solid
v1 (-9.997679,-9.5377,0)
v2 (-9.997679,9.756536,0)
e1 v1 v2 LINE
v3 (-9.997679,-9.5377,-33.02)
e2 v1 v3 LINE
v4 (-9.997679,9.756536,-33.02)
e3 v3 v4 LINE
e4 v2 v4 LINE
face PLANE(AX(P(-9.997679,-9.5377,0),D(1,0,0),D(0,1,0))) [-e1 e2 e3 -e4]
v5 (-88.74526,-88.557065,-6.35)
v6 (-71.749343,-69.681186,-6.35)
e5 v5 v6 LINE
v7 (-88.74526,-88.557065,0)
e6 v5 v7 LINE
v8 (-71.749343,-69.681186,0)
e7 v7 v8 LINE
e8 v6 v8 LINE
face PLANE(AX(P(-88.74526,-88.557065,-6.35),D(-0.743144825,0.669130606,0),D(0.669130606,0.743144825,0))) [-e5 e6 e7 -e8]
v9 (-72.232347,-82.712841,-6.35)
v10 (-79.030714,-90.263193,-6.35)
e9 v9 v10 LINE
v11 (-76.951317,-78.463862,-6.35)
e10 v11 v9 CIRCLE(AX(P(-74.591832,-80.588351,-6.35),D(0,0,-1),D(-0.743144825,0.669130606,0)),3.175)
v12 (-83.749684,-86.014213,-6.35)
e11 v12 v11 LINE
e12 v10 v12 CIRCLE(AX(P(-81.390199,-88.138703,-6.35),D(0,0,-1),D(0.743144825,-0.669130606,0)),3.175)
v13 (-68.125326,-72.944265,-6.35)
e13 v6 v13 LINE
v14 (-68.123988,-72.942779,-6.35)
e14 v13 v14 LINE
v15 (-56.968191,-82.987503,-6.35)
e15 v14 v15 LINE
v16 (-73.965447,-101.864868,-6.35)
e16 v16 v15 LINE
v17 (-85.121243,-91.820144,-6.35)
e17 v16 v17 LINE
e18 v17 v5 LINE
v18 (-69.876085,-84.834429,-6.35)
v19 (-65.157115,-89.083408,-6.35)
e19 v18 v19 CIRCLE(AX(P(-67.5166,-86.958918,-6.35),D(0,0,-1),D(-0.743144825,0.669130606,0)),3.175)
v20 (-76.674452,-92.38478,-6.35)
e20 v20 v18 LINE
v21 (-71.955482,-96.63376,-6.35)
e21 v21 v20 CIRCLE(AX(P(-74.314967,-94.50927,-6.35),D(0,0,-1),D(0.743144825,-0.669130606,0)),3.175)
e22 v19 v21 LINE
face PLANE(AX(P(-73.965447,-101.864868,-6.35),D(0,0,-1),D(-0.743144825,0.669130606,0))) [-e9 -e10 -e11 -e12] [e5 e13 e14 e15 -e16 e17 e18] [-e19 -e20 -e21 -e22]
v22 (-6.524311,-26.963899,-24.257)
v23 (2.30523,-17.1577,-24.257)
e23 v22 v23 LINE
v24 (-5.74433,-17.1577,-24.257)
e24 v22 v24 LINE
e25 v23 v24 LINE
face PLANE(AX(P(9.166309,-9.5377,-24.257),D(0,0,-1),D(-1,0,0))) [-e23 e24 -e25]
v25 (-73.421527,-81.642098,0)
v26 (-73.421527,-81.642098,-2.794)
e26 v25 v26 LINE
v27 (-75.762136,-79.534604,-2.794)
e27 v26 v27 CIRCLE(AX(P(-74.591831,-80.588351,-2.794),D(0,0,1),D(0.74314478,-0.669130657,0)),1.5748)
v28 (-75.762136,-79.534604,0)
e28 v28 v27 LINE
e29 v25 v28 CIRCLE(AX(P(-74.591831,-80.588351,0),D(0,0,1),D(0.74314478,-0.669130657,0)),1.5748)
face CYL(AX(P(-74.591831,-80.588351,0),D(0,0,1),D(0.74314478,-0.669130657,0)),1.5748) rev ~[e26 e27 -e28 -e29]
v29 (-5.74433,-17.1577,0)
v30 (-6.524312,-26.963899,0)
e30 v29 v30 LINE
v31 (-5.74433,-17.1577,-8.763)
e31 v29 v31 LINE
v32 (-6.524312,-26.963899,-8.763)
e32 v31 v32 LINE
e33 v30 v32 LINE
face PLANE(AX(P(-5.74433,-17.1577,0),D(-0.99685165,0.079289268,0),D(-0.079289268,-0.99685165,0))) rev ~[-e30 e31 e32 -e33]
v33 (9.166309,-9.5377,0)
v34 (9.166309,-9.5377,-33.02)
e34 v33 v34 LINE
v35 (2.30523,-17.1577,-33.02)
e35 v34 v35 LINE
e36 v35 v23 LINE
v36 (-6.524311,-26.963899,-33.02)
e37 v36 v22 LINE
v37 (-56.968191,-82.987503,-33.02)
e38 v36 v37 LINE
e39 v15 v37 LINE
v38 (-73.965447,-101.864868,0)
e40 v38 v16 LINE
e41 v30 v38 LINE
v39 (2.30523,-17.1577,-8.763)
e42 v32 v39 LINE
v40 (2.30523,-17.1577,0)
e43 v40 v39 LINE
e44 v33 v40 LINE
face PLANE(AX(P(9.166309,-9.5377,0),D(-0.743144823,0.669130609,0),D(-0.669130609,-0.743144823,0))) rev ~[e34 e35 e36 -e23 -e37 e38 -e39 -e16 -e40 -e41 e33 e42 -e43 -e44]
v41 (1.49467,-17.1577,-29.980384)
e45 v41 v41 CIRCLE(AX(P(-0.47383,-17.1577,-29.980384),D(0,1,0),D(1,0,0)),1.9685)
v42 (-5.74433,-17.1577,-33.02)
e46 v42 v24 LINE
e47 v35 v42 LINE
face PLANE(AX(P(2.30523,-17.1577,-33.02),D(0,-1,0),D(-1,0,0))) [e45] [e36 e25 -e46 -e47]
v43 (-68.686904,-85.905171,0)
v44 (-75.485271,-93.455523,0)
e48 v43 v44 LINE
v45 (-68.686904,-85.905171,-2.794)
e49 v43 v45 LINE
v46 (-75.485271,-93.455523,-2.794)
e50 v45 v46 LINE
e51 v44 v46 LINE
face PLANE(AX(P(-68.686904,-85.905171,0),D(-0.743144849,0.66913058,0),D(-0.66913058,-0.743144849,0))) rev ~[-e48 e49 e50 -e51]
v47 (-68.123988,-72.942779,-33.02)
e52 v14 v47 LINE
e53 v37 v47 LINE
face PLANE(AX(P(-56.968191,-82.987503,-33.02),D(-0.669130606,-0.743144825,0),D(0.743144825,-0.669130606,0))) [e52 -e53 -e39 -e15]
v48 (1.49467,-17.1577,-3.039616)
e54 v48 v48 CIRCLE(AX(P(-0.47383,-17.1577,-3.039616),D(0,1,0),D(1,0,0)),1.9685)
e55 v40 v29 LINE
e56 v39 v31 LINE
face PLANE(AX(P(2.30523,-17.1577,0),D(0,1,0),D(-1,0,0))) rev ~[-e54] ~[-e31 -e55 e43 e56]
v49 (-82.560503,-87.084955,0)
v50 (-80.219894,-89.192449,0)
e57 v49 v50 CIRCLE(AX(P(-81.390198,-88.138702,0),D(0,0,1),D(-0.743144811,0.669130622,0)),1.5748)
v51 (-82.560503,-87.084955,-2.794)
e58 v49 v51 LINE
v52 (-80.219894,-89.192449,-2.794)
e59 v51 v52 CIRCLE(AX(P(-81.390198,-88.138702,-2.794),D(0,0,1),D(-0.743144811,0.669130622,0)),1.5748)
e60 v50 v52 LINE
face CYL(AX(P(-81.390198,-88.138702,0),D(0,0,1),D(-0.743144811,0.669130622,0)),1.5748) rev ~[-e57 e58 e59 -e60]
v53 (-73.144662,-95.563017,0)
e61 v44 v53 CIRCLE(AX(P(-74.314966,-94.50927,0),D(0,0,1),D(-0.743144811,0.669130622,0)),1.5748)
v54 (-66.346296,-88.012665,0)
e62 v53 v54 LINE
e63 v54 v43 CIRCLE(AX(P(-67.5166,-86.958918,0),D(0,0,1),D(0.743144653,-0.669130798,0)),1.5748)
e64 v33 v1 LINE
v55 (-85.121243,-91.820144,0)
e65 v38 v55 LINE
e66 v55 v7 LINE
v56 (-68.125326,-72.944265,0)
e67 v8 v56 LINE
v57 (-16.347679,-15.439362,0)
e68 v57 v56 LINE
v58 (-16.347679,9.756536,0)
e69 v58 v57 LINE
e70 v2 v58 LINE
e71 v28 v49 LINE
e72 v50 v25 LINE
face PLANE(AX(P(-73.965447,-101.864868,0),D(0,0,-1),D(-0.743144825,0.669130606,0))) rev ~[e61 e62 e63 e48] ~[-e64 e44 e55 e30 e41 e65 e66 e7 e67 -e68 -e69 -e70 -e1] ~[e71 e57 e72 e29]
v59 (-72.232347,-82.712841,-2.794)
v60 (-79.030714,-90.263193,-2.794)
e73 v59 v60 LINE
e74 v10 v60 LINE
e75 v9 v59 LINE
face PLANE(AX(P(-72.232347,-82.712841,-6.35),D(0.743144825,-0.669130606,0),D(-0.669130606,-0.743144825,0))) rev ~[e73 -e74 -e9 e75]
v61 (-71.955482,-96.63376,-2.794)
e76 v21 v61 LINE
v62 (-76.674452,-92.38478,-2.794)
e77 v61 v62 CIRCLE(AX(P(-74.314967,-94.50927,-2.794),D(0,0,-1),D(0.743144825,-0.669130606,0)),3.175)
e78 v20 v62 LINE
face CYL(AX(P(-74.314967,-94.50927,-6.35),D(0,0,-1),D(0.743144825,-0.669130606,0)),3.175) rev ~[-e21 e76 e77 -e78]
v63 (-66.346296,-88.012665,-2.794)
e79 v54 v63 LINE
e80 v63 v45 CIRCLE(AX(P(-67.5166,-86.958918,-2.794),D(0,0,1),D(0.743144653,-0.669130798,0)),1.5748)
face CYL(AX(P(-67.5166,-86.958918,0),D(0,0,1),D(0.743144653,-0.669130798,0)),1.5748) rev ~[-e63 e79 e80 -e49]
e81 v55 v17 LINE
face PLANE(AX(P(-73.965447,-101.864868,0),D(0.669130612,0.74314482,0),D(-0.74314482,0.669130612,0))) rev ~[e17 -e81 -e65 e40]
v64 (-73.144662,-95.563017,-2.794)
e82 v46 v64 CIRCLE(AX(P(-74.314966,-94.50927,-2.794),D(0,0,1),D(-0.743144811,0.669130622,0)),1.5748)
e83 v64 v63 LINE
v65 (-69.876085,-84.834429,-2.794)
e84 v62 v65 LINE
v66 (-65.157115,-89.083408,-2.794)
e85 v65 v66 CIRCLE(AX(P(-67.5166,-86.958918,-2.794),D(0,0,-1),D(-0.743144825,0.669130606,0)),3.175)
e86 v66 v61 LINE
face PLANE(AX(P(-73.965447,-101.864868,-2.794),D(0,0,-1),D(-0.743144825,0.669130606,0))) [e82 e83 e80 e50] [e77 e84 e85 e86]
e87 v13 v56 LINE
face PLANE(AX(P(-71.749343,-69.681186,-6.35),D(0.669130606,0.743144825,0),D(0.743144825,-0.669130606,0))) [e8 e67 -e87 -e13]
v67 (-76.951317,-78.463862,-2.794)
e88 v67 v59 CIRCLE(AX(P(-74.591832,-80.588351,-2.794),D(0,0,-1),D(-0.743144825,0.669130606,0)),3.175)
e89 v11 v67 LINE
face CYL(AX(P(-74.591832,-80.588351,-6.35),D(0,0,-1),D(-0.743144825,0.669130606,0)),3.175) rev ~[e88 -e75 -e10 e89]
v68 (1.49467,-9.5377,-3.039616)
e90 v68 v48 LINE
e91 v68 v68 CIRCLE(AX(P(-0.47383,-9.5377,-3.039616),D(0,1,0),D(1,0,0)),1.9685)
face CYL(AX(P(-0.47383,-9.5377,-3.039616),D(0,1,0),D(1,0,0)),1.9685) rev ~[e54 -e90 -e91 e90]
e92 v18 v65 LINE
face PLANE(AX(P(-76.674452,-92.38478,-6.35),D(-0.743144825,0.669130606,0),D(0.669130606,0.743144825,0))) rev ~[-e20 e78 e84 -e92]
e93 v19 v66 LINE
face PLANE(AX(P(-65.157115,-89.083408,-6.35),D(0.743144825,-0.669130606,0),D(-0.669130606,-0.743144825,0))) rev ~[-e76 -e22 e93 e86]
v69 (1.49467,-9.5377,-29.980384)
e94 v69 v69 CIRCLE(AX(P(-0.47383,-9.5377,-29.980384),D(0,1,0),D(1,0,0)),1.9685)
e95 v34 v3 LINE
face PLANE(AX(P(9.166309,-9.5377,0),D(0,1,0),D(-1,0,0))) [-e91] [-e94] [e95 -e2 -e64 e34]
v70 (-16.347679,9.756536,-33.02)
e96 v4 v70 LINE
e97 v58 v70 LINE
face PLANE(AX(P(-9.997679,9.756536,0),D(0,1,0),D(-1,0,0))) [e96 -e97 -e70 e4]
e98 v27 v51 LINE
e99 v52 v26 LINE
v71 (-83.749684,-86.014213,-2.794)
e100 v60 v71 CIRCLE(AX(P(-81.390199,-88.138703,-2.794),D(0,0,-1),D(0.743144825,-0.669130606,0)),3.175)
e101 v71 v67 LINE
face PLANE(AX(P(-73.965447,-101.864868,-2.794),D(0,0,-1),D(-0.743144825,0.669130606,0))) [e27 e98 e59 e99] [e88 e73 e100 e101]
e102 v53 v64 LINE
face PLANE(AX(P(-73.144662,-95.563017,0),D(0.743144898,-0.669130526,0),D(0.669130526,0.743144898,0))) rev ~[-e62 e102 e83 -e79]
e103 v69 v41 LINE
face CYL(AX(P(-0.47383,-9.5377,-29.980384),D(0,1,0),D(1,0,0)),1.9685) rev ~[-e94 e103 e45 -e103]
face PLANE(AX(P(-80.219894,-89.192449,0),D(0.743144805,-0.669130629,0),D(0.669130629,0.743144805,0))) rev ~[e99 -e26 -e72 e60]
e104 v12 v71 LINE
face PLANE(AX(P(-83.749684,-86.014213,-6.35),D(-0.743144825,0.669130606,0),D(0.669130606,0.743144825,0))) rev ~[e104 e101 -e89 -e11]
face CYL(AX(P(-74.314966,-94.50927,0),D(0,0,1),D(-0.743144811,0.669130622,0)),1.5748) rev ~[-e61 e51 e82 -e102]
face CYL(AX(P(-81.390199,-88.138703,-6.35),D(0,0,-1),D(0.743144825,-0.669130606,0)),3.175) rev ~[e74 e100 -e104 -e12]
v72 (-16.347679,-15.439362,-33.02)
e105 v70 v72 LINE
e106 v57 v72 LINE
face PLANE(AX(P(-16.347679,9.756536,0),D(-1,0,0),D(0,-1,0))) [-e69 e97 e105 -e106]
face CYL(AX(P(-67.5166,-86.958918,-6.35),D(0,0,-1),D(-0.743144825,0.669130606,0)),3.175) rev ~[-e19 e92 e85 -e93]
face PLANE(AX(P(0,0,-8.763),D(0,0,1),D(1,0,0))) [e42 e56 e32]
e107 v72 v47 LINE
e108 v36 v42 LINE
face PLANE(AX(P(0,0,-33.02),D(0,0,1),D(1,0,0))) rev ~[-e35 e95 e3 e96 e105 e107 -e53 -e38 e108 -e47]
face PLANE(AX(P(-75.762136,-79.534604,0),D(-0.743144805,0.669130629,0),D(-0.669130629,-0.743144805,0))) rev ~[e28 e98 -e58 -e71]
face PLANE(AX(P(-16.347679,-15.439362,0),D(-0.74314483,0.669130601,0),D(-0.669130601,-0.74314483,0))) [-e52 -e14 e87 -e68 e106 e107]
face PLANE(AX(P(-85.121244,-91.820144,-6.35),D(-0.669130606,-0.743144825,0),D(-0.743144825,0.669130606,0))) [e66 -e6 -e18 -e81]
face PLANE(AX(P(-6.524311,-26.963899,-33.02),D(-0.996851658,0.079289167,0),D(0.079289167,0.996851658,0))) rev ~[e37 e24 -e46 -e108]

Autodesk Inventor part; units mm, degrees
ref_plane "YZ Plane" through (0, 0, 0) normal (1, 0, 0) x (0, 1, 0)
ref_plane "XZ Plane" through (0, 0, 0) normal (0, 1, 0) x (-1, 0, 0)
ref_plane "Work Plane1" through (0, 0, 0) normal (0, 0, 1) x (1, 0, 0)
sketch "Sketch1" plane through (0, 0, 0) normal (0, 0, 1) x (1, 0, 0)
  line L0 (4.129202, -9.5377) -> (6.406797, -9.5377) construction
  line L1 (9.525, -8.41296) -> (9.525, -7.435497) construction
  line L2 (-6.406797, 9.5123) -> (-4.129202, 9.5123) construction
  line L3 (-9.525, 4.116502) -> (-9.525, 6.394097) construction
  line L4 (9.314549, -9.373063) -> (-73.965447, -101.864868) construction
  line L5 (9.166309, -9.5377) -> (-73.965447, -101.864868)
  line L6 (-73.965447, -101.864868) -> (-85.121243, -91.820144)
  line L7 (6.33881, 9.756536) -> (-85.121243, -91.820144) construction
  line L8 (9.166309, -9.5377) -> (-9.997679, -9.5377)
  line L9 (-9.997679, -9.5377) -> (-9.997679, 9.756536)
  line L10 (-9.997679, 9.756536) -> (-16.347679, 9.756536)
  line L11 (-16.347679, 9.756536) -> (-16.347679, -15.439362)
  line L12 (-16.347679, -15.439362) -> (-85.121243, -91.820144)
  point P0 (0, 0)
  dimension "d0" = 124.46
  dimension "d1" = 48
  dimension "d5" = 6.35
ref_plane "Work Plane2" through (-4.445, -9.144, -33.02) normal (0, 0, -1) x (0, 1, 0)
extrude "Extrusion1" add sketch "Sketch1" against normal up to surface (33.02 mm away)
sketch "Sketch2" plane through (-73.965447, -101.864868, -33.02) normal (-0.6691306, -0.7431448, 0) x (0.7431448, -0.6691306, 0)
  line L0 (0, 33.02) -> (0, 0)
  line L1 (-15.011605, 33.02) -> (-15.011605, 0)
  line L2 (0, 0) -> (-15.011605, 0)
  line L3 (-15.011605, 0) -> (-15.011605, 26.67)
  line L4 (-15.011605, 26.67) -> (0, 26.67)
  line L5 (0, 26.67) -> (0, 0)
  line L6 (-15.011605, 33.02) -> (0, 33.02)
  point P0 (-13.193862, 33.02)
  dimension "d19" = 6.35
extrude "Extrusion2" cut sketch "Sketch2" against normal blind 25.4 contours L0 L2 L1 L4
sketch "Sketch3" plane through (-73.965447, -101.864868, -6.35) normal (0, 0, -1) x (-0.7431448, 0.6691306, 0)
  line L0 (19.8882, 12.0904) -> (19.8882, 3.175) construction
  line L1 (0, 25.4) -> (15.011605, 25.4) construction
  line L2 (15.011605, 0) -> (0, 0) construction
  line L3 (0, 0) -> (19.8882, 0) construction
  line L4 (19.8882, 0) -> (19.8882, 25.4) construction
  line L5 (19.8882, 25.4) -> (0, 25.4) construction
  line L6 (0, 25.4) -> (0, 0) construction
  line L7 (15.011605, 0) -> (19.8882, 0)
  line L8 (19.8882, 0) -> (19.8882, 25.4)
  line L9 (19.8882, 25.4) -> (15.011605, 25.4)
  line L10 (15.011605, 25.4) -> (15.011605, 0)
  point P0 (13.193862, 125.192894)
extrude "Extrusion3" add sketch "Sketch3" against normal up to surface (6.35 mm away)
sketch "Sketch4" plane through (0, 0, 0) normal (0, 0, 1) x (1, 0, 0)
  line L0 (-88.74526, -88.557064) -> (-71.749342, -69.681186) construction
  line L1 (-73.965447, -101.864868) -> (9.166309, -9.5377) construction
  line L2 (-74.314967, -94.50927) -> (-67.5166, -86.958918) construction
  line L3 (-73.965447, -101.864868) -> (-56.969529, -82.988989) construction
  line L4 (-73.965447, -101.864868) -> (-88.74526, -88.557064) construction
  line L5 (-81.390199, -88.138702) -> (-74.591832, -80.588351) construction
  line L6 (-74.314967, -94.50927) -> (-67.5166, -86.958918) construction
  line L7 (-73.144662, -95.563017) -> (-66.346296, -88.012665)
  line L8 (-68.686904, -85.905171) -> (-75.485271, -93.455523)
  arc A0 (-75.485271, -93.455523) -> (-73.144662, -95.563017) centre (-74.314967, -94.50927) ccw
  arc A1 (-66.346296, -88.012665) -> (-68.686904, -85.905171) centre (-67.5166, -86.958918) ccw
  line L9 (-81.390199, -88.138702) -> (-74.591832, -80.588351) construction
  line L10 (-80.219894, -89.192449) -> (-73.421527, -81.642098)
  line L11 (-75.762136, -79.534604) -> (-82.560503, -87.084955)
  arc A2 (-82.560503, -87.084955) -> (-80.219894, -89.192449) centre (-81.390199, -88.138702) ccw
  arc A3 (-73.421527, -81.642098) -> (-75.762136, -79.534604) centre (-74.591832, -80.588351) ccw
  point P0 (0, 0)
  point P1 (-70.915783, -90.734094)
  point P2 (-77.991015, -84.363527)
  dimension "d37" = 10.16
  dimension "d38" = 5.1816
  dimension "d39" = 5.2324
  dimension "d40" = 9.52066
  dimension "d41" = 3.1496
  dimension "d42" = 3.1496
extrude "Extrusion4" cut sketch "Sketch4" against normal through all
sketch "Sketch6" plane through (-9.997679, -9.5377, 0) normal (0, 1, 0) x (1, 0, 0)
  arc A0 (9.506526, 4.79213) -> (10.740649, 4.300966) centre (9.523849, 3.039616) ccw construction
  arc A1 (9.506526, 31.732899) -> (10.740649, 31.241734) centre (9.523849, 29.980384) ccw construction
  circle A2 centre (9.523849, 29.980384) radius 1.9685
  circle A3 centre (9.523849, 3.039616) radius 1.9685
  point P0 (9.997679, 0)
  dimension "d24" = 3.937
  dimension "d25" = 3.937
extrude "Extrusion6" cut sketch "Sketch6" against normal through all
sketch "Sketch7" plane through (9.166309, -9.5377, 0) normal (0.7431448, -0.6691306, 0) x (0, 0, -1)
  line L0 (33.02, -98.838459) -> (33.02, 0) construction
  line L1 (33.02, -9.525) -> (0, -9.525) construction
  point P0 (0, 0.954435)
sketch "Sketch8" plane through (9.166309, -9.5377, -33.02) normal (0, 0, -1) x (-1, 0, 0)
  line L0 (11.608639, 0) -> (11.608639, -12.892699) construction
  line L1 (66.135838, -73.451289) -> (0, 0) construction
  line L2 (11.608639, -7.62) -> (6.861079, -7.62) construction
  line L3 (0, 0) -> (19.163987, 0) construction
  line L4 (7.671639, 0) -> (7.671639, -8.520218) construction
  line L5 (14.910639, 0) -> (14.910639, -14.251905) construction
  line L6 (6.861079, -7.62) -> (14.910639, -7.62)
  line L7 (83.131755, -92.327168) -> (0, 0)
  line L8 (15.69062, -17.426199) -> (6.861079, -7.62)
  line L9 (15.69062, -17.426199) -> (14.910639, -7.62)
  point P0 (9.166309, 9.5377)
  dimension "d28" = 7.62
  dimension "d29" = 3.302
extrude "Extrusion7" cut sketch "Sketch8" against normal blind 8.763
sketch "Sketch9" plane through (0, 0, 0) normal (0, 0, 1) x (1, 0, 0)
  line L0 (2.30523, -17.1577) -> (-5.74433, -17.1577) construction
  line L1 (-5.74433, -17.1577) -> (-6.524312, -26.963899) construction
  line L2 (2.30523, -17.1577) -> (-6.524312, -26.963899)
  line L3 (-73.965447, -101.864868) -> (9.166309, -9.5377)
  line L4 (2.30523, -17.1577) -> (-5.74433, -17.1577)
  line L5 (-5.2705, -26.963899) -> (-5.2705, -17.1577)
  point P0 (0, 0)
sketch "Sketch9 outline for Extrusion8" plane through (0, 0, 0) normal (0, 0, 1) x (1, 0, 0)
  line L0 (-6.524312, -26.963899) -> (2.30523, -17.1577)
  line L1 (-5.74433, -17.1577) -> (-6.524312, -26.963899)
  line L2 (2.30523, -17.1577) -> (-5.74433, -17.1577)
extrude "Extrusion8" cut sketch "Sketch9 outline for Extrusion8" against normal blind 8.763
sketch "Sketch10" plane through (9.166309, -9.5377, -33.02) normal (0, 0, -1) x (-1, 0, 0)
  line L0 (25.513987, -5.901662) -> (77.291634, -63.406565)
  line L1 (51.797758, -35.092747) -> (40.641962, -45.137471)
  line L2 (66.135838, -73.451289) -> (15.69062, -17.426199) construction
  line L3 (40.913229, -45.438744) -> (36.5125, -40.551239) construction
  line L4 (66.135838, -73.451289) -> (77.291634, -63.406565) construction
  point P0 (9.166309, 9.5377)
  dimension "d34" = 38.1
sketch "Sketch11" plane through (-73.965447, -101.864868, -6.35) normal (0, 0, -1) x (-0.7431448, 0.6691306, 0)
  arc A0 (3.6068, 5.2324) -> (6.7564, 5.2324) centre (5.1816, 5.2324) ccw construction
  arc A1 (6.7564, 15.3924) -> (3.6068, 15.3924) centre (5.1816, 15.3924) ccw construction
  line L0 (5.1816, 5.2324) -> (5.1816, 15.3924) construction
  arc A2 (13.127463, 5.2324) -> (16.277063, 5.2324) centre (14.702263, 5.2324) ccw construction
  arc A3 (16.277063, 15.3924) -> (13.127463, 15.3924) centre (14.702263, 15.3924) ccw construction
  line L1 (14.702263, 5.2324) -> (14.702263, 15.3924) construction
  line L2 (14.702263, 5.2324) -> (14.702263, 15.3924) construction
  line L3 (17.877263, 5.2324) -> (17.877263, 15.3924)
  line L4 (11.527263, 15.3924) -> (11.527263, 5.2324)
  arc A4 (11.527263, 5.2324) -> (17.877263, 5.2324) centre (14.702263, 5.2324) ccw
  arc A5 (17.877263, 15.3924) -> (11.527263, 15.3924) centre (14.702263, 15.3924) ccw
  line L5 (5.1816, 5.2324) -> (5.1816, 15.3924) construction
  line L6 (8.3566, 5.2324) -> (8.3566, 15.3924)
  line L7 (2.0066, 15.3924) -> (2.0066, 5.2324)
  arc A6 (2.0066, 5.2324) -> (8.3566, 5.2324) centre (5.1816, 5.2324) ccw
  arc A7 (8.3566, 15.3924) -> (2.0066, 15.3924) centre (5.1816, 15.3924) ccw
  point P0 (13.193862, 125.192894)
  point P1 (14.702263, 10.3124)
  point P2 (5.1816, 10.3124)
  dimension "d43" = 6.35
  dimension "d44" = 6.35
extrude "Extrusion9" cut sketch "Sketch11" against normal blind 3.556
properties part number "arm stop 48 degree whole"
